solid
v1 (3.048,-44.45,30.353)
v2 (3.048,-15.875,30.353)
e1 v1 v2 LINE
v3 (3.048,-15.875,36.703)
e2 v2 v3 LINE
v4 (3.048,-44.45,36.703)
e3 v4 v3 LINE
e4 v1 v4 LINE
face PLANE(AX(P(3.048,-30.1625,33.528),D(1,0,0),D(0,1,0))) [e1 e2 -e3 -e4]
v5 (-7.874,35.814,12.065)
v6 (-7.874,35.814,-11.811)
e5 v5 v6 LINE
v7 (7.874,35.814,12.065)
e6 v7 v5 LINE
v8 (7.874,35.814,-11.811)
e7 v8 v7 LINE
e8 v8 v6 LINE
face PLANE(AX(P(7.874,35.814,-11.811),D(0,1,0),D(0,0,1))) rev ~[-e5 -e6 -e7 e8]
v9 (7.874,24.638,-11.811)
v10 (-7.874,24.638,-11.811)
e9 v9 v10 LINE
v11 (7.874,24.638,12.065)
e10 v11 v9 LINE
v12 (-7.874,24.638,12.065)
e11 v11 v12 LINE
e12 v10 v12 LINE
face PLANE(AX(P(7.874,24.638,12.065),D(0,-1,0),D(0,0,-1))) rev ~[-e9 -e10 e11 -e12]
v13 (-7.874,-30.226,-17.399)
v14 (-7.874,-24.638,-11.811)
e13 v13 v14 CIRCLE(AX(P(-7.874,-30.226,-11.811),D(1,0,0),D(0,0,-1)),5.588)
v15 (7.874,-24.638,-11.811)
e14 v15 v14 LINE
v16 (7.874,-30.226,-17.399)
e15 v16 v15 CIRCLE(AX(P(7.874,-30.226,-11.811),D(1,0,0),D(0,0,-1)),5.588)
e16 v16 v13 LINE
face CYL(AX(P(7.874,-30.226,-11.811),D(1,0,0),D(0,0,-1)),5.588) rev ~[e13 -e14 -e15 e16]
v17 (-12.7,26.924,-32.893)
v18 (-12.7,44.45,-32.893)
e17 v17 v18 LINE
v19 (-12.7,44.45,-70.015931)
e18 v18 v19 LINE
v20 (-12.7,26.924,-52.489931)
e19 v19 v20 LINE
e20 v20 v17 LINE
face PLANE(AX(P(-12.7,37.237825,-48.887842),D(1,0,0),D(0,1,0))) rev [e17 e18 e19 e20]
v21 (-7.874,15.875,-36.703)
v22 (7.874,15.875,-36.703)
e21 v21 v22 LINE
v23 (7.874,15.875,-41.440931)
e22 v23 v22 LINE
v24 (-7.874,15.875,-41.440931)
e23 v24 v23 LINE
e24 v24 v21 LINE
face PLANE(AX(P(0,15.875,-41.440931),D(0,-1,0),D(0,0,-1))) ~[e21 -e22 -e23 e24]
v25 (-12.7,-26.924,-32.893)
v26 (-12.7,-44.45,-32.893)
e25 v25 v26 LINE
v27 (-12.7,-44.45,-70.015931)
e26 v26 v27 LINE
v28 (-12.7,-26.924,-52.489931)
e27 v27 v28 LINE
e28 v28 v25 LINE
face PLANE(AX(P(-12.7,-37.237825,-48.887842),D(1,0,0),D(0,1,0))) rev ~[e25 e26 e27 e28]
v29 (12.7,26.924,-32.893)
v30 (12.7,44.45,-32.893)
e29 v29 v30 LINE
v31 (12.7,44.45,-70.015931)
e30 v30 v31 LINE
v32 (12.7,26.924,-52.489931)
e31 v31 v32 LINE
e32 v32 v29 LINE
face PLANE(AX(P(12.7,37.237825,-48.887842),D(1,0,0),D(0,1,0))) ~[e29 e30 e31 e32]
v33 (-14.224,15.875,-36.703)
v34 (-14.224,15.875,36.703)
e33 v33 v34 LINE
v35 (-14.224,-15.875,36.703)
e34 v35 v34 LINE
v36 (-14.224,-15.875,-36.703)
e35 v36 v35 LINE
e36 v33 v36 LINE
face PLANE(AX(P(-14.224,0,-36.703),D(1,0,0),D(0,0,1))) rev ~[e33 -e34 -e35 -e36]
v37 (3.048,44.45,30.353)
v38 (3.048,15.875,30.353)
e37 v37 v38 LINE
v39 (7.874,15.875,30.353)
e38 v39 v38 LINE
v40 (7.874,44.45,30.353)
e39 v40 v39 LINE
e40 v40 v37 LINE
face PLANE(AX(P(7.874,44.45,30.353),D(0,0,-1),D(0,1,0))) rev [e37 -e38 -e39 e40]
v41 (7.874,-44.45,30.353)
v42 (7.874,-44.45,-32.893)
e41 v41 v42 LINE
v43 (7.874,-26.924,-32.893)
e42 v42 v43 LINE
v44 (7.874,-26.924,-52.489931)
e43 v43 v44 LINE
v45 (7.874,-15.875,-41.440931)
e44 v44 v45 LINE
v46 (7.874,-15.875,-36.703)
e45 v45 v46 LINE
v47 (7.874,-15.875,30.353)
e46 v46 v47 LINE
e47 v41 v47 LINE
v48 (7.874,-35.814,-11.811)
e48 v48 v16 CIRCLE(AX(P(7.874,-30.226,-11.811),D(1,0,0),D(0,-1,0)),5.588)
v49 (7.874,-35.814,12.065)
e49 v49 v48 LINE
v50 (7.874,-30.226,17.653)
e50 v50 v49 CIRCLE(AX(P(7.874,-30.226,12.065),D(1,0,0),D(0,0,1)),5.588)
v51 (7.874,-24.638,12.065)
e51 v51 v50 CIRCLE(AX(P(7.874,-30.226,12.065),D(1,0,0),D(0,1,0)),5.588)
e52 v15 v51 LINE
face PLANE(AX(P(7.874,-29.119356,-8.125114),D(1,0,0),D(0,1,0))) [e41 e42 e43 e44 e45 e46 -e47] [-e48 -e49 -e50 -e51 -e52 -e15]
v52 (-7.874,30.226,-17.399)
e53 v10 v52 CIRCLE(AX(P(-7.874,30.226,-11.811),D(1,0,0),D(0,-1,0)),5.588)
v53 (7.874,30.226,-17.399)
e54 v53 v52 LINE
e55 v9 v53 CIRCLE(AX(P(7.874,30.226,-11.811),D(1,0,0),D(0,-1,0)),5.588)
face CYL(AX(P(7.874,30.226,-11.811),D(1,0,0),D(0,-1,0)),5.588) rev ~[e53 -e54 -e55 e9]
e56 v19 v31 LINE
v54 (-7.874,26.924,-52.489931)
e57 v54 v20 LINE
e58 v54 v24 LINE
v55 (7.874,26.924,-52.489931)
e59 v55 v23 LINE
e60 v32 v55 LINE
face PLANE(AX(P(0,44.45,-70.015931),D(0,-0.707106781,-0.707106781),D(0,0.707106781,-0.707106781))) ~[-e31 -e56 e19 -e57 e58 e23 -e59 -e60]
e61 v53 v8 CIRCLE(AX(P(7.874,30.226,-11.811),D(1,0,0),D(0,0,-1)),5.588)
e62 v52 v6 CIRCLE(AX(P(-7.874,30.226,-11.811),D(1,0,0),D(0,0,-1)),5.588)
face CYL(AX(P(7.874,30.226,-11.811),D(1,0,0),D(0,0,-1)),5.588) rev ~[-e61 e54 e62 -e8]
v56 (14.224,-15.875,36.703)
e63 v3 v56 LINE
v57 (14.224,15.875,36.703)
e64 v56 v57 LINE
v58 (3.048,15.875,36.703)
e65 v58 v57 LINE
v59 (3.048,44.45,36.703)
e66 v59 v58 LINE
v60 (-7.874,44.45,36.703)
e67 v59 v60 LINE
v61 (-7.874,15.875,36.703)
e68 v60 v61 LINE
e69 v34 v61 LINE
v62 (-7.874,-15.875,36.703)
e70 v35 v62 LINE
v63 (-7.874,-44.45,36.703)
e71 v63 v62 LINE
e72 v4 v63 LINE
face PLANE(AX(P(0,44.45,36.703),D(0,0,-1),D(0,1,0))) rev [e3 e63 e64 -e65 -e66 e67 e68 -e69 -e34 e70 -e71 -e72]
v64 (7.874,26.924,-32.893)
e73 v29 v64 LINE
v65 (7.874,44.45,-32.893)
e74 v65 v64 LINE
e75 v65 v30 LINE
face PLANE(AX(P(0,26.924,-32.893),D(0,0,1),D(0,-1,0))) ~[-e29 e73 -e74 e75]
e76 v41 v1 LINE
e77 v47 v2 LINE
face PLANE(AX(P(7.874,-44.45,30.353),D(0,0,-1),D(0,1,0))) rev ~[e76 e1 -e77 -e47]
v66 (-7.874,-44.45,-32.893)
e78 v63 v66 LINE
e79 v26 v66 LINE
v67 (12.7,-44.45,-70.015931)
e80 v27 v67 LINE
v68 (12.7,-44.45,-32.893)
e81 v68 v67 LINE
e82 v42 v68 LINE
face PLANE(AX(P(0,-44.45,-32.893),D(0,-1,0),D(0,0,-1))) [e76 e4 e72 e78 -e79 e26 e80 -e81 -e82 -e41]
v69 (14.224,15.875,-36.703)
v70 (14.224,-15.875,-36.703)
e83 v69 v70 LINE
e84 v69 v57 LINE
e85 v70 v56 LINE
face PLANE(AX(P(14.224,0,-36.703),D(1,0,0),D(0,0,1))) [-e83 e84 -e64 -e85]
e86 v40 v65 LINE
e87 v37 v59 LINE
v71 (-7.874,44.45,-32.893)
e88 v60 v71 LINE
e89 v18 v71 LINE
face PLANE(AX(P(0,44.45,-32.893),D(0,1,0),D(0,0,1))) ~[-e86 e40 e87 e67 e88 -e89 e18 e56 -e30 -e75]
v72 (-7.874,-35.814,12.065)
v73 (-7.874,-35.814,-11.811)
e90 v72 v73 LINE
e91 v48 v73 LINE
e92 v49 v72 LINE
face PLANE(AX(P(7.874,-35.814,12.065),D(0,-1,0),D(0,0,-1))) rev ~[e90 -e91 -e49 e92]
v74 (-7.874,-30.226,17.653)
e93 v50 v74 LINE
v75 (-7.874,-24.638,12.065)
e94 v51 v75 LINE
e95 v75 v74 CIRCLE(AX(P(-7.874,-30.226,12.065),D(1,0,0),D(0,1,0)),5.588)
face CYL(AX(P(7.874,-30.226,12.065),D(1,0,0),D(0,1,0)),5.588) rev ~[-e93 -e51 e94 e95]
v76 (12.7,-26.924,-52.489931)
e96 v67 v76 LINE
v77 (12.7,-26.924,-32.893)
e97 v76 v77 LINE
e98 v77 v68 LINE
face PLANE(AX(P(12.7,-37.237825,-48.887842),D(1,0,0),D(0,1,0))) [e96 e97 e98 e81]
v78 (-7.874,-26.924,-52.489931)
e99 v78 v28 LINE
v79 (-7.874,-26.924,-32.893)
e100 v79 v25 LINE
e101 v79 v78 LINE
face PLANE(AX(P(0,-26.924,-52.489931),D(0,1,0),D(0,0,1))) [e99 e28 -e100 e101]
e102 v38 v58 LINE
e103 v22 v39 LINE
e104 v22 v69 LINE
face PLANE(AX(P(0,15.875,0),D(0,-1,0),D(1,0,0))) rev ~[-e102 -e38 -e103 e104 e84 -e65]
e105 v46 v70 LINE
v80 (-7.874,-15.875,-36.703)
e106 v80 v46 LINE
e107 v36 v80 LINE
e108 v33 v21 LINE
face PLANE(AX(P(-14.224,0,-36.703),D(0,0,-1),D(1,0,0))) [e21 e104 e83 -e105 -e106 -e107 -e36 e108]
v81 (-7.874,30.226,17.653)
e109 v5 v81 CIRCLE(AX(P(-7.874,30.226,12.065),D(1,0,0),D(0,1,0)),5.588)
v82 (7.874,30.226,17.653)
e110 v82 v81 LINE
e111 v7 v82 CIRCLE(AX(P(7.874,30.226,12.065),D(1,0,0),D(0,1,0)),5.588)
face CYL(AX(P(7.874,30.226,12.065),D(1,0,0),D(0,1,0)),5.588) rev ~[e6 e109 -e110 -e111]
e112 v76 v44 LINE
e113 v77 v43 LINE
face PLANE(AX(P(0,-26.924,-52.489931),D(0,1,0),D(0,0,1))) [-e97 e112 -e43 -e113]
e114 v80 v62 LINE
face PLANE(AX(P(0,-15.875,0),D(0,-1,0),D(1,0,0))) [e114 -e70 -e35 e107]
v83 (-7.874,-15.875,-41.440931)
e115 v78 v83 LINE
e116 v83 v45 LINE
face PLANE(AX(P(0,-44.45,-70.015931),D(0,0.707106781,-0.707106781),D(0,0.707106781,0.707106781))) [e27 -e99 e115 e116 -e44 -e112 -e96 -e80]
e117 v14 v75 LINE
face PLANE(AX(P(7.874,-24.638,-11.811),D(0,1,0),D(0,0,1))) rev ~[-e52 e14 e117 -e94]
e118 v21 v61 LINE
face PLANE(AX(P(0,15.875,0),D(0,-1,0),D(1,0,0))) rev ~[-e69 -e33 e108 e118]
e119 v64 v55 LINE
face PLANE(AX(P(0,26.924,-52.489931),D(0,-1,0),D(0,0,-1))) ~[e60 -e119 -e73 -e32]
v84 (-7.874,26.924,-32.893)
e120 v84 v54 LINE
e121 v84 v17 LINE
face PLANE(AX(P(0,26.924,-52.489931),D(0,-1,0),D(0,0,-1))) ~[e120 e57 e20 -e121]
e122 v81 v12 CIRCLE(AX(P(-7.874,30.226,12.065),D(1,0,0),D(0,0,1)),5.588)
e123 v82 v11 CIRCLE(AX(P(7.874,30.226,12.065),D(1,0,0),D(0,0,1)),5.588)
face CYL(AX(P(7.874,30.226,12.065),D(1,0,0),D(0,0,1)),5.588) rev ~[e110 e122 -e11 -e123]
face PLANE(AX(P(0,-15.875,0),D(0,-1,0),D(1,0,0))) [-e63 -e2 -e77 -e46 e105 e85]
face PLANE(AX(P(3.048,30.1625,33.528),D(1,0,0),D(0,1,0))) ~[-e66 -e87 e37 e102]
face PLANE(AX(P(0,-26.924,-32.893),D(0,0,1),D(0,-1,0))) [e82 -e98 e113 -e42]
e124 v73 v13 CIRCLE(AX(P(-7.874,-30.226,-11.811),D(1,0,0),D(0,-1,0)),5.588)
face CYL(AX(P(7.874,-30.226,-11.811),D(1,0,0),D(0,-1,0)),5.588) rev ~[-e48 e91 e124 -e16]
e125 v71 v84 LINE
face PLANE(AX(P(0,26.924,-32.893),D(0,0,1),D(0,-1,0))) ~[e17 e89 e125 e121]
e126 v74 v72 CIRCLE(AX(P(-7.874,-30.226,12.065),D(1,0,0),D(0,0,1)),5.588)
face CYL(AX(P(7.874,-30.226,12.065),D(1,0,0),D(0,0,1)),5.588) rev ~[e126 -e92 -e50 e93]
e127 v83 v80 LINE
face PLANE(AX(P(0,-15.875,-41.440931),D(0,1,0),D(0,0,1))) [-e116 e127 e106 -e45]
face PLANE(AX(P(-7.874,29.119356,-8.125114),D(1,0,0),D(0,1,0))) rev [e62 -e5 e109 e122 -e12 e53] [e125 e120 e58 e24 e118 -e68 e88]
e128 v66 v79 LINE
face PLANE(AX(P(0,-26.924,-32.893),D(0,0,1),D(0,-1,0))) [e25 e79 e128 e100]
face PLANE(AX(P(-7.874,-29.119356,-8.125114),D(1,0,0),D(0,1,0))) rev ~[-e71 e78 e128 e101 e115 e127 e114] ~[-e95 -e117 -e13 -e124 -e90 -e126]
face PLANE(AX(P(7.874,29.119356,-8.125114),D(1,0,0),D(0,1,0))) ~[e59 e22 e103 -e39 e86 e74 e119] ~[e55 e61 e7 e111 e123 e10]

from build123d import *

# Parameters (mm, degrees)
F0_W      = 28.448
F0_H      = 73.406
F1_DEPTH  = 15.875
F2_W      = 28.575
F2_H      = 6.35
F3_DEPTH  = 7.874
F5_W      = 28.575
F5_H      = 6.35
F6_DEPTH  = 4.826
F8_DEPTH  = 12.7
F12_DEPTH = 40.132


with BuildPart() as f1:
    # F0 (on Front) → F1 (new body, symmetric)
    with BuildSketch(Plane.XZ):
        Rectangle(F0_W, F0_H)
    extrude(amount=F1_DEPTH, both=True)

    # F2 (on Right) → F3 (join, symmetric)
    with BuildSketch(Plane.YZ):
        Polygon((-15.875, -36.703), (-15.875, 30.353), (-44.45, 30.353), (-44.45, -32.893), (-26.924, -32.893), (-26.924, -52.4899314183), (-15.875, -41.4409314183), align=None)
        with Locations((-30.1625, 33.528)):
            Rectangle(F2_W, F2_H)
    extrude(amount=F3_DEPTH, both=True)

    # F5 (on offset) → F6 (cut)
    with BuildSketch(Plane.YZ.offset(7.874)):
        with Locations((-30.1625, 33.528)):
            Rectangle(F5_W, F5_H)
    extrude(amount=-F6_DEPTH, mode=Mode.SUBTRACT)

    # F7 (on Right) → F8 (join, symmetric)
    with BuildSketch(Plane.YZ):
        Polygon((-26.924, -32.893), (-44.45, -32.893), (-44.45, -70.0159314183), (-26.924, -52.4899314183), align=None)
    extrude(amount=F8_DEPTH, both=True)

    # F10: F1 across plane


with BuildPart() as f1_1:
    add(f1.part)
    add(f1.part.mirror(Plane.XZ))

    # F11 (on offset) → F12 (cut)
    with BuildSketch(Plane.YZ.offset(7.874)):
        with BuildLine():
            ThreePointArc((-30.226, 17.653), (-34.1773126933, 16.0163126933), (-35.814, 12.065))
            Line((-35.814, 12.065), (-35.814, -11.811))
            ThreePointArc((-35.814, -11.811), (-34.1773126933, -15.7623126933), (-30.226, -17.399))
            ThreePointArc((-30.226, -17.399), (-26.2746873067, -15.7623126933), (-24.638, -11.811))
            Line((-24.638, -11.811), (-24.638, 12.065))
            ThreePointArc((-24.638, 12.065), (-26.2746873067, 16.0163126933), (-30.226, 17.653))
        make_face()
        with BuildLine():
            ThreePointArc((30.226, -17.399), (34.1773126933, -15.7623126933), (35.814, -11.811))
            Line((35.814, -11.811), (35.814, 12.065))
            ThreePointArc((35.814, 12.065), (34.1773126933, 16.0163126933), (30.226, 17.653))
            ThreePointArc((30.226, 17.653), (26.2746873067, 16.0163126933), (24.638, 12.065))
            Line((24.638, 12.065), (24.638, -11.811))
            ThreePointArc((24.638, -11.811), (26.2746873067, -15.7623126933), (30.226, -17.399))
        make_face()
    extrude(amount=-F12_DEPTH, mode=Mode.SUBTRACT)


solid = f1_1.part
